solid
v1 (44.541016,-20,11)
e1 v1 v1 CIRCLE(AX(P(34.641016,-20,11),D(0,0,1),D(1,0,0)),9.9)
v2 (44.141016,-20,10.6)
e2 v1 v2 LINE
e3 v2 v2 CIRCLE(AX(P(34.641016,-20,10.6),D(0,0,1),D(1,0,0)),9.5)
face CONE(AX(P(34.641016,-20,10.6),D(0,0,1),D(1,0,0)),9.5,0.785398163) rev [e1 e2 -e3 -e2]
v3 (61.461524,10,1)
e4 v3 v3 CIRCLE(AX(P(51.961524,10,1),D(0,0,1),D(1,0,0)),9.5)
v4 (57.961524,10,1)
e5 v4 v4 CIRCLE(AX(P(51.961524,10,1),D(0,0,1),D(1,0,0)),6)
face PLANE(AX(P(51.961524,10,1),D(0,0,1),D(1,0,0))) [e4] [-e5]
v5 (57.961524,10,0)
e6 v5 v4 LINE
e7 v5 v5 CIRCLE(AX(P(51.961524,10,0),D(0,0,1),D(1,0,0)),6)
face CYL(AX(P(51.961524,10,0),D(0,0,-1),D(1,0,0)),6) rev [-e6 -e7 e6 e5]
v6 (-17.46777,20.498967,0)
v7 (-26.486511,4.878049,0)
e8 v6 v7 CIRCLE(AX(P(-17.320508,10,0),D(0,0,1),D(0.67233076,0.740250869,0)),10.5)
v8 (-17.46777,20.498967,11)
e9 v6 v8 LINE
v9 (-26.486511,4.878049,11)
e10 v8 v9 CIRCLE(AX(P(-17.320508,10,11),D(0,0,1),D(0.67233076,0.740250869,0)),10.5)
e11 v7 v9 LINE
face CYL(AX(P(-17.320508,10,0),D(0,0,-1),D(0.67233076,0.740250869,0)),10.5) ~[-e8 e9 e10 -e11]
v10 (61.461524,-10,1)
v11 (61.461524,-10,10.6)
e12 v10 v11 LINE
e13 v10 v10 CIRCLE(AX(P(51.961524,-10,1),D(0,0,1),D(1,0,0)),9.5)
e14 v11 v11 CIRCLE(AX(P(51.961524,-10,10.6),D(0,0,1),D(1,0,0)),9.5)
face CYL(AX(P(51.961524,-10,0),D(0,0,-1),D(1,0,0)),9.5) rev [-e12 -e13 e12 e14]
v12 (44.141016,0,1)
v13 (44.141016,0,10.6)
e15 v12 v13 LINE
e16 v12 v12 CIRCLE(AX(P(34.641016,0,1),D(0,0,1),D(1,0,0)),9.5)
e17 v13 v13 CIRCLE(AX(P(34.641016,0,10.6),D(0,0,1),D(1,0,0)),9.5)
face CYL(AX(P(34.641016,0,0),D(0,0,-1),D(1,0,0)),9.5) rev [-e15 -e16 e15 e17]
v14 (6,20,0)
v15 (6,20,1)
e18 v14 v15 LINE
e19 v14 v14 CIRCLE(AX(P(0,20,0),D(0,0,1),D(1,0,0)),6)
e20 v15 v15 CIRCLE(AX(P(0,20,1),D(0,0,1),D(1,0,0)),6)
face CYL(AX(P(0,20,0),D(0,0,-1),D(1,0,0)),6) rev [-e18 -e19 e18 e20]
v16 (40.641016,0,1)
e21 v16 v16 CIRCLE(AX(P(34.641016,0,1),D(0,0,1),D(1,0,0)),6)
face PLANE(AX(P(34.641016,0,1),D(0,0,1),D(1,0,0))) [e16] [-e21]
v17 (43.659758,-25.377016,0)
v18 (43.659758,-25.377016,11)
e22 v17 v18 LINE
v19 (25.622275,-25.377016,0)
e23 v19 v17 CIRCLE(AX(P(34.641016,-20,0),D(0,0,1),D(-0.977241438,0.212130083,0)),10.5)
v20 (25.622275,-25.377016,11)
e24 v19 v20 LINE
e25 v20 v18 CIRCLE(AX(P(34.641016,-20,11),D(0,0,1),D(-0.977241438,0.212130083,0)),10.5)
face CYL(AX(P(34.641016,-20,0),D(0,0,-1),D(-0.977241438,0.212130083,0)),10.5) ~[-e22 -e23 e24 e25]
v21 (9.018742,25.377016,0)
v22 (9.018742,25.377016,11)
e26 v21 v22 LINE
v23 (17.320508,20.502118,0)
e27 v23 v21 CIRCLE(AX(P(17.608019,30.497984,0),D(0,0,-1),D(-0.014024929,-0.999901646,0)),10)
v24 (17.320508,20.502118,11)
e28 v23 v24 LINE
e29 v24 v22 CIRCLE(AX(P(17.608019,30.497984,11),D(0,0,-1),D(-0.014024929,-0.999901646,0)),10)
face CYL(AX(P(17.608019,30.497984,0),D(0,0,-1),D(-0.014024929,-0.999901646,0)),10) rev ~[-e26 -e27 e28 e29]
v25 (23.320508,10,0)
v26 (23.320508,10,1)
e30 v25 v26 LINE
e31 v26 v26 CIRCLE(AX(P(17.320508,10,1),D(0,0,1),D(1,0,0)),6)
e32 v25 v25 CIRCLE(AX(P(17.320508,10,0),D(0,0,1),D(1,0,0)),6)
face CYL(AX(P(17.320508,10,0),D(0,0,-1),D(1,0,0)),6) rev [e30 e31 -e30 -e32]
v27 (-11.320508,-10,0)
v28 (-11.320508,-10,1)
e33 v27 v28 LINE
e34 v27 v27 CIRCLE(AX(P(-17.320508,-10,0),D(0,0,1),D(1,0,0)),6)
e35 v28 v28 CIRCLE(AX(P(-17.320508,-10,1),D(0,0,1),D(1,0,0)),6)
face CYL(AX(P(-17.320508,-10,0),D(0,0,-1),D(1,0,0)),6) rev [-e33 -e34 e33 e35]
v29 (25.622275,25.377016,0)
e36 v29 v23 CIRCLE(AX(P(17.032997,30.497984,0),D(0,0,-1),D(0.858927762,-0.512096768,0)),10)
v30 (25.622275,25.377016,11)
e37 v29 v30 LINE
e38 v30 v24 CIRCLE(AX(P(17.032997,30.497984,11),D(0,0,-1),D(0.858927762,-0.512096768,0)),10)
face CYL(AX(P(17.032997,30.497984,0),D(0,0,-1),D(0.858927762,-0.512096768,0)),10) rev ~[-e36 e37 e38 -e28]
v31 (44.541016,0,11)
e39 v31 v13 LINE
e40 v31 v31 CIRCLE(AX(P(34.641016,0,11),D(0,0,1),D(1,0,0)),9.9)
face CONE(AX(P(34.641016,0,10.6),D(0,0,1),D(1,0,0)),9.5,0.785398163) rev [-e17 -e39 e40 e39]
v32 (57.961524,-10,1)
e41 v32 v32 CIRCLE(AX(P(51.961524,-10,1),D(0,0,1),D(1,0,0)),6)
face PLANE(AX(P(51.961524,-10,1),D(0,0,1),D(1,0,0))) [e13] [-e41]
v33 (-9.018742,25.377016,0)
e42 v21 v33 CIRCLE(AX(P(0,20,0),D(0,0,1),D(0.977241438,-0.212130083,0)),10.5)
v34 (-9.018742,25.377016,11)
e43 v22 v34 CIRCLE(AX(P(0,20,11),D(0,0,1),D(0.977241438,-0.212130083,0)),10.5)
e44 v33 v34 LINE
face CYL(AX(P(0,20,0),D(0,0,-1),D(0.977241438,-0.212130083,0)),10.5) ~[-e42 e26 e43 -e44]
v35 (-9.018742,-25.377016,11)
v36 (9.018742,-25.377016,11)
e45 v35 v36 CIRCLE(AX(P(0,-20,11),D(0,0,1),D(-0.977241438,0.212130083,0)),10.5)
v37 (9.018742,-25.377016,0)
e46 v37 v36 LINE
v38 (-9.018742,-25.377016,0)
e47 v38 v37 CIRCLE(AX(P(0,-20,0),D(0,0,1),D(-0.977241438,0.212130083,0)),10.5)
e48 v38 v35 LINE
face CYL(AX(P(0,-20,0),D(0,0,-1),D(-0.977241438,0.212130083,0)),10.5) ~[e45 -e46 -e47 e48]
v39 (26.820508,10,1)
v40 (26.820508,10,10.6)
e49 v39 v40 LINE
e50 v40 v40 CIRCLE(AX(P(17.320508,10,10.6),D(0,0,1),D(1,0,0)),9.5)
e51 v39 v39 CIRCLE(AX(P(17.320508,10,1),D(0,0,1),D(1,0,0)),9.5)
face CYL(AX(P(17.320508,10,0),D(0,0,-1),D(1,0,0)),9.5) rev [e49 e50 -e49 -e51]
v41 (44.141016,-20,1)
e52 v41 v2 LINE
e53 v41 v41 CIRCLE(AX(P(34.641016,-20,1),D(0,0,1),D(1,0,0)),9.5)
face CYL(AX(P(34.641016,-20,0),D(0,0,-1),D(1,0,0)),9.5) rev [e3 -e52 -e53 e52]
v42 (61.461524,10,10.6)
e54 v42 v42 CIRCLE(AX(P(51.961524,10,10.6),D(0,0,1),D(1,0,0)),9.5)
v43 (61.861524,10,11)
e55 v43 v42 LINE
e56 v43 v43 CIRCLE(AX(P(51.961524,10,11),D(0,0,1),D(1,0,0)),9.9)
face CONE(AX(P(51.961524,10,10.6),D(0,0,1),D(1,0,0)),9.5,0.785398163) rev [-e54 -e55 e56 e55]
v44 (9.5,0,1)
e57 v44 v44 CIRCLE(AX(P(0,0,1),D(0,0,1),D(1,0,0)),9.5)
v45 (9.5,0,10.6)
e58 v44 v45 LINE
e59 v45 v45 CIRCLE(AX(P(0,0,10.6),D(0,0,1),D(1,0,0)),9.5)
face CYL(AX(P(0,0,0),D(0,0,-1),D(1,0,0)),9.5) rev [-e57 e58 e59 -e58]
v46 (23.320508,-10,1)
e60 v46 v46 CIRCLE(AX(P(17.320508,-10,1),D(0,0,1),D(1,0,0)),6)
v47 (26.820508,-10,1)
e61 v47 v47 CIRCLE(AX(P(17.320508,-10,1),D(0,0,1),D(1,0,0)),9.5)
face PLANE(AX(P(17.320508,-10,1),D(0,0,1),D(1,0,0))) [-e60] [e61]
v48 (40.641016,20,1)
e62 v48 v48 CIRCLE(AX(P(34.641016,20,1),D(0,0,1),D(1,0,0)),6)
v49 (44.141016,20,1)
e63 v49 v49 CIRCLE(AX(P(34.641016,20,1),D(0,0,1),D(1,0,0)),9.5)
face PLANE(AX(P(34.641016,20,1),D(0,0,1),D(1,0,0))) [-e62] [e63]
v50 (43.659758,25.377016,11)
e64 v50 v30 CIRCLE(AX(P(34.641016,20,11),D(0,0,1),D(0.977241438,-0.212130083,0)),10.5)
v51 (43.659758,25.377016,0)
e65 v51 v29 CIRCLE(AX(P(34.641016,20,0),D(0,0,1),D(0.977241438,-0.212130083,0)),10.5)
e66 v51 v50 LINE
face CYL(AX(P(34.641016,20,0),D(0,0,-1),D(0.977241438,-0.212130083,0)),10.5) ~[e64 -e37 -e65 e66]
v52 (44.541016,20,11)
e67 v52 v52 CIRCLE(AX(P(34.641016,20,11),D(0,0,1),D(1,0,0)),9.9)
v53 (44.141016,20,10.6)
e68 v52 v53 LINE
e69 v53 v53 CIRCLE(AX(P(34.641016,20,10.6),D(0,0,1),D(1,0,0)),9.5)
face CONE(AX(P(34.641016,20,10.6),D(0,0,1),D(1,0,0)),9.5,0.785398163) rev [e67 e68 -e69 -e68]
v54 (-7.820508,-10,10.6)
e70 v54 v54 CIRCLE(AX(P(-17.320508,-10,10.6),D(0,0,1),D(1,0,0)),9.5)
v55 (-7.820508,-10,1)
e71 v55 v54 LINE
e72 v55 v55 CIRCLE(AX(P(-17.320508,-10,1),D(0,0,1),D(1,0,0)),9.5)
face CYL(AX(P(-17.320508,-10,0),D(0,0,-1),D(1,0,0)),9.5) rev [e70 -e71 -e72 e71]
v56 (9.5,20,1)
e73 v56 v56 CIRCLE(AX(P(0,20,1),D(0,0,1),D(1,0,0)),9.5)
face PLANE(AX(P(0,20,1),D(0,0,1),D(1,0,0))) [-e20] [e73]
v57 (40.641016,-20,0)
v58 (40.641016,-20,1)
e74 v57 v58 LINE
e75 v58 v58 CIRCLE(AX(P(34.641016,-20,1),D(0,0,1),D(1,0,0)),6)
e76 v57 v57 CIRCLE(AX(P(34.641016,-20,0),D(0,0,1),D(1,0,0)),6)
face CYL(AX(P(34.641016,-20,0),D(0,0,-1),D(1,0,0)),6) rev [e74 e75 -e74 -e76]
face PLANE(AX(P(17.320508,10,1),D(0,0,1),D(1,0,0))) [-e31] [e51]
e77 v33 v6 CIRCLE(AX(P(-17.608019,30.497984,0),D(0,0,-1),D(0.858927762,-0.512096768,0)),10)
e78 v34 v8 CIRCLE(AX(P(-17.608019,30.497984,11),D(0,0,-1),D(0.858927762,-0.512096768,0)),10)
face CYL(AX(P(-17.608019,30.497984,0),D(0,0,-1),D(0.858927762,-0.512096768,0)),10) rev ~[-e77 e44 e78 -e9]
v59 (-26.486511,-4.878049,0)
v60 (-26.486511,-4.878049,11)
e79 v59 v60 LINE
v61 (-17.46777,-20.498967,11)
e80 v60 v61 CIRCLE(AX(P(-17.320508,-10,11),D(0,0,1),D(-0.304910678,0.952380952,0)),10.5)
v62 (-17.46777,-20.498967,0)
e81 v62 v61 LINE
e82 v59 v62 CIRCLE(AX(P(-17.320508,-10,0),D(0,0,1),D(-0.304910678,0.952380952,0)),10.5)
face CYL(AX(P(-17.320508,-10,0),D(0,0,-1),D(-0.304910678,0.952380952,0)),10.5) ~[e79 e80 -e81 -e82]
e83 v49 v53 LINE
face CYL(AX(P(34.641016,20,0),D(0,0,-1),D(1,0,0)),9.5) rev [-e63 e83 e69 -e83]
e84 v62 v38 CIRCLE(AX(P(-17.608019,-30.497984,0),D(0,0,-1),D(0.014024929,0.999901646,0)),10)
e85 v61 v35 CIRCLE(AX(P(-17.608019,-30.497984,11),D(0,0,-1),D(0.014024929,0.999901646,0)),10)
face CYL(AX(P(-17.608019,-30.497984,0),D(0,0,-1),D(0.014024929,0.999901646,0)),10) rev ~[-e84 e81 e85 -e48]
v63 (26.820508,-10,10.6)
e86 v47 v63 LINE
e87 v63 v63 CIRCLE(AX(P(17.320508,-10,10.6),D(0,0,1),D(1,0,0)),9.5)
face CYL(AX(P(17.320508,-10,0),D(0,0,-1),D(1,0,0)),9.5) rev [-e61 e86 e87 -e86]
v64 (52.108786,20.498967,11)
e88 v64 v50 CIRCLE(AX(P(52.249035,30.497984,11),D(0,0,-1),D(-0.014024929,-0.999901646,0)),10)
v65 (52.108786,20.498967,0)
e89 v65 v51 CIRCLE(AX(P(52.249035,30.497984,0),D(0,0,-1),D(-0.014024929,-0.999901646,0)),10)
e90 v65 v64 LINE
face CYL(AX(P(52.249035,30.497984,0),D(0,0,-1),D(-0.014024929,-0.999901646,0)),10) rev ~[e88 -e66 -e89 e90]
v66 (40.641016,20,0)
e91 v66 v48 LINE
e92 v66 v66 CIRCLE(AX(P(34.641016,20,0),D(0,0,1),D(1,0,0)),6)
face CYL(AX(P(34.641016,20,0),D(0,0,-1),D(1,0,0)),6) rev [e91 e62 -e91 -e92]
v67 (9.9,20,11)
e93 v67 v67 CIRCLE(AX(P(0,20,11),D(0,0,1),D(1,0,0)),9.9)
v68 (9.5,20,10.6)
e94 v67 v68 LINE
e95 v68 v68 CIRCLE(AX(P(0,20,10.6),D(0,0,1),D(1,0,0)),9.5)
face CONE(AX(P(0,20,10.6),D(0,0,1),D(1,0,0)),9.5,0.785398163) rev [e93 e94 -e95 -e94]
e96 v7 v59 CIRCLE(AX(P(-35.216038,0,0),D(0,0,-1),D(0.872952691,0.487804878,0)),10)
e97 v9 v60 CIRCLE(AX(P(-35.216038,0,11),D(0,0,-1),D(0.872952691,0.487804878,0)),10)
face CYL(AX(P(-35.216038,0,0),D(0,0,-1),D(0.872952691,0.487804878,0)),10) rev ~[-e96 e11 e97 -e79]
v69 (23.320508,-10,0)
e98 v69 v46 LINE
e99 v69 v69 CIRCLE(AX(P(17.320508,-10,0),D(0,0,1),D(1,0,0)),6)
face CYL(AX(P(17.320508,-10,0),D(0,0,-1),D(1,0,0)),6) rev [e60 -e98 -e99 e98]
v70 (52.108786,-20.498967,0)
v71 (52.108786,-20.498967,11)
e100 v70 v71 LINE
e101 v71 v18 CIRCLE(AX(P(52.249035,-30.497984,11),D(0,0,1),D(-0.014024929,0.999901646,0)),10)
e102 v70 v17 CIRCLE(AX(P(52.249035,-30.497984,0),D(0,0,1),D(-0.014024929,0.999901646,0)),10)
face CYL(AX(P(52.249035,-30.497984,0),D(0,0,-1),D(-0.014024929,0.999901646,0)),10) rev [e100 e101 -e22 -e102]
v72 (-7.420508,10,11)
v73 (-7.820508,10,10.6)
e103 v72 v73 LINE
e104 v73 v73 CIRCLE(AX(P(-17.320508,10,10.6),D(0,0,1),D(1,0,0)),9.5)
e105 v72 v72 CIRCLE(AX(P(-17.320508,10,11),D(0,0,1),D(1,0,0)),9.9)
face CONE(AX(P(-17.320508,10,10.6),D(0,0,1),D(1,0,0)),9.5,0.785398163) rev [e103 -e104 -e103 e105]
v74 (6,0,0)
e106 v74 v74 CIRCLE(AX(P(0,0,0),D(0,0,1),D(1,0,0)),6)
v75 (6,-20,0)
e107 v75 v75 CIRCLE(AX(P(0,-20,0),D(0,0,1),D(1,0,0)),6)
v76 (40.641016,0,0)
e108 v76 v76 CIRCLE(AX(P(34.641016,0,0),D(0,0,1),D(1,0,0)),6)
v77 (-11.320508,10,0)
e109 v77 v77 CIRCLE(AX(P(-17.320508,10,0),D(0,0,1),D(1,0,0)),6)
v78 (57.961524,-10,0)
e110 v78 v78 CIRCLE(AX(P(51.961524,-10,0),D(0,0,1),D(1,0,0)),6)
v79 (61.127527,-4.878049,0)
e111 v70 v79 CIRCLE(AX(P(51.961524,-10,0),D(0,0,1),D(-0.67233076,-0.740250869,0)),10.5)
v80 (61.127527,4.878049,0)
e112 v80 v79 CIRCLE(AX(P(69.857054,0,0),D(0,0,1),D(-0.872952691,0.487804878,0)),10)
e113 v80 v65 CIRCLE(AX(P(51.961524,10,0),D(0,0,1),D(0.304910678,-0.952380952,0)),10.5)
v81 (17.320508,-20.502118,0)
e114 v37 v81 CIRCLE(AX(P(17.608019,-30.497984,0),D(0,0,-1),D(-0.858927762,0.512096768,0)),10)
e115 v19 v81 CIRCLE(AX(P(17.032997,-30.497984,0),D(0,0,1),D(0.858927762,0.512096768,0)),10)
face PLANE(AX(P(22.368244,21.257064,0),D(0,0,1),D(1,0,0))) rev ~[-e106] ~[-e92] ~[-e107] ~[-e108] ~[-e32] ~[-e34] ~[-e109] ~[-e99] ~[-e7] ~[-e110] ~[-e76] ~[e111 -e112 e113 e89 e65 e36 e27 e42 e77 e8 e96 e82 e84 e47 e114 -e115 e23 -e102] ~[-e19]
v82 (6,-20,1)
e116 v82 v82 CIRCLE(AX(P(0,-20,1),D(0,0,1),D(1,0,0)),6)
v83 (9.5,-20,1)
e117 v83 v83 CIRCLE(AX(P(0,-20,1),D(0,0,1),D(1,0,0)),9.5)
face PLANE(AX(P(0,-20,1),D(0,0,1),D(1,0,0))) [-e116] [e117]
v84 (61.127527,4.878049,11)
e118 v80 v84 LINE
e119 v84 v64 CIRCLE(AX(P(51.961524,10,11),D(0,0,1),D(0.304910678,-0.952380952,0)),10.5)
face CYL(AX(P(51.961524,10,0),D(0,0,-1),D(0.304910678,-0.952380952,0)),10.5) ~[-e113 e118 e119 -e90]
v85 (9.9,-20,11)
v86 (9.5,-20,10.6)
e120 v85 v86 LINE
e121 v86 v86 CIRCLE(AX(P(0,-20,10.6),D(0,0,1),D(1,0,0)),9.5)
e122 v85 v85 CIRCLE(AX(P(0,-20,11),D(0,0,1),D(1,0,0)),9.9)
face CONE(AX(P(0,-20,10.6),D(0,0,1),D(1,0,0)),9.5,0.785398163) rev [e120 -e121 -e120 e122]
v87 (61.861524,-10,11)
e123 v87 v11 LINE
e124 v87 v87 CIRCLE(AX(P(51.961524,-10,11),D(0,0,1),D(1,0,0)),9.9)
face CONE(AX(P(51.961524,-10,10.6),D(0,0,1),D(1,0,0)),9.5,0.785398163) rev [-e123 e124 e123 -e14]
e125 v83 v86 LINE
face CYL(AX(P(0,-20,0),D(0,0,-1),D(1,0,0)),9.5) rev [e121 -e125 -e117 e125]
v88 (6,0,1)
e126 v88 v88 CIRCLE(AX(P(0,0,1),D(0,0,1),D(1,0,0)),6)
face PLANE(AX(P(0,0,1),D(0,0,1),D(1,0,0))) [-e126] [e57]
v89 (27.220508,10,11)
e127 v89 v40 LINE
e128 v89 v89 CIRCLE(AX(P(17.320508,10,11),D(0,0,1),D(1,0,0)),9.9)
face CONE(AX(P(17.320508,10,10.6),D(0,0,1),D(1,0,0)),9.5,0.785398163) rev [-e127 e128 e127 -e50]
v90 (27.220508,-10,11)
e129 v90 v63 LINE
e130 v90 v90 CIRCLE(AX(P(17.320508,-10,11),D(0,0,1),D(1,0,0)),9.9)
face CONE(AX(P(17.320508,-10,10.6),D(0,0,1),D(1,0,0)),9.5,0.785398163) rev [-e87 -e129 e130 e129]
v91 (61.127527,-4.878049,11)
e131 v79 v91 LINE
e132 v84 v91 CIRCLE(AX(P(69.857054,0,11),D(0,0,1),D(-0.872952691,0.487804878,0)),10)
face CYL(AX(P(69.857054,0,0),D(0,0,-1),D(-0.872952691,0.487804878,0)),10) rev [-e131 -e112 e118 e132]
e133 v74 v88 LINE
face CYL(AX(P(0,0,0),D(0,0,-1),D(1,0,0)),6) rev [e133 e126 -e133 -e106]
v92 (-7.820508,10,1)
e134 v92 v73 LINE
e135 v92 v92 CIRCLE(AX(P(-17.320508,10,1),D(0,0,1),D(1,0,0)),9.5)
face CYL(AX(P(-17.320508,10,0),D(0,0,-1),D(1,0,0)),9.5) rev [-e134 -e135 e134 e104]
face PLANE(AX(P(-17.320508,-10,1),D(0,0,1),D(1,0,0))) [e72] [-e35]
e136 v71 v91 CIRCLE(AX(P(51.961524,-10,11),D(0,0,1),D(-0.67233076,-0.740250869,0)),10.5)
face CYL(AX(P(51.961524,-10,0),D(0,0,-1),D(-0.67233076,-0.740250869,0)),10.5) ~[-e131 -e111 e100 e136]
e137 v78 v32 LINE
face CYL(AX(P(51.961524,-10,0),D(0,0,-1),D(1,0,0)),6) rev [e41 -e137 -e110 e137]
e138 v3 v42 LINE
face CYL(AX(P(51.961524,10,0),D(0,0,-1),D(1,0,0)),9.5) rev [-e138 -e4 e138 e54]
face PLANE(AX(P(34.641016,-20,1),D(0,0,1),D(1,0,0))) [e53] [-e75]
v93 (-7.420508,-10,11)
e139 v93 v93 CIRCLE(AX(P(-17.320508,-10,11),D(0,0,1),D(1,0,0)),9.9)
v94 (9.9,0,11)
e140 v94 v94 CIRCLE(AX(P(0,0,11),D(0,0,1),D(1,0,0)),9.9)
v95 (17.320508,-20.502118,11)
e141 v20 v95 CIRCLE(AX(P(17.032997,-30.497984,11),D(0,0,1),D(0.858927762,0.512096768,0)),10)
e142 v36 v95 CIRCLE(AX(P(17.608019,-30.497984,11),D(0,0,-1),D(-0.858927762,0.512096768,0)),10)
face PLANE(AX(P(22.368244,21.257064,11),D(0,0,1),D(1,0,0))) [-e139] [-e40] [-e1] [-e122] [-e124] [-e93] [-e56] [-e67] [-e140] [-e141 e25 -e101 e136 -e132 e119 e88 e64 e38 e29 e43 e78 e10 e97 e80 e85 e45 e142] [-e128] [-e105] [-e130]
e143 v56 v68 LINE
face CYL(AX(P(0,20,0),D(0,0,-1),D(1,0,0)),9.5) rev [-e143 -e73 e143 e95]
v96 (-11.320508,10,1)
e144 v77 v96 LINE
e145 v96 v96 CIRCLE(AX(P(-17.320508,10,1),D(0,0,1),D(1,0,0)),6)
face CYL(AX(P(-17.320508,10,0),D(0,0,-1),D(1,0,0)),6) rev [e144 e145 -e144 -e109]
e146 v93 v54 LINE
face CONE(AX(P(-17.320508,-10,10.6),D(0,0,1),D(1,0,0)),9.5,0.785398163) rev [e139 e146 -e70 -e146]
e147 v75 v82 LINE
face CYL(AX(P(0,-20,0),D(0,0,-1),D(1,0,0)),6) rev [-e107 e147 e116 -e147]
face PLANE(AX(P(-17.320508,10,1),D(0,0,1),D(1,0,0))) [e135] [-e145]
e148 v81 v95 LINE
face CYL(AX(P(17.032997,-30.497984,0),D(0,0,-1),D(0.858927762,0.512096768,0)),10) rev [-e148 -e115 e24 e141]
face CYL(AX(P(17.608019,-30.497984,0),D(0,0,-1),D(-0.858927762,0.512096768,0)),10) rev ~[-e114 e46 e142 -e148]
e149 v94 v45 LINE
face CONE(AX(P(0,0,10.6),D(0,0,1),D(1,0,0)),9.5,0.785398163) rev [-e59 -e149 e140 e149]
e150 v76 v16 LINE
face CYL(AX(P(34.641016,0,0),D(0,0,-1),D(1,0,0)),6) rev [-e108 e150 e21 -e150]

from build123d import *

# Parameters (mm, degrees)
F0_R        = 9.5
F1_DEPTH    = 11
F0_R_2      = 6
F2_DEPTH    = 1
F3_T1_DEPTH = 11
F4_SIZE     = 0.4


# Not quite as in the source:
# - a fillet or chamfer that OpenCascade refuses, or shapes differently, is made with other operations: its cross-section is extruded or revolved along the edge and cut away or added


with BuildPart() as f1:
    # F0 (on Top) → F1 (new body)
    with BuildSketch(Plane.XY):
        with BuildLine():
            ThreePointArc((10.2610350972, 17.7726341266), (0, 30.5), (-10.2610350972, 17.7726341266))
            ThreePointArc((-10.2610350972, 17.7726341266), (-26.4137748154, 15.25), (-20.5220701944, 0))
            ThreePointArc((-20.5220701944, 0), (-26.4137748154, -15.25), (-10.2610350972, -17.7726341266))
            ThreePointArc((-10.2610350972, -17.7726341266), (0, -30.5), (10.2610350972, -17.7726341266))
            ThreePointArc((10.2610350972, -17.7726341266), (17.3205080757, -20.5), (24.3799810542, -17.7726341266))
            ThreePointArc((24.3799810542, -17.7726341266), (34.6410161514, -30.5), (44.9020512486, -17.7726341266))
            ThreePointArc((44.9020512486, -17.7726341266), (61.0547909668, -15.25), (55.1630863458, 0))
            ThreePointArc((55.1630863458, 0), (61.0547909668, 15.25), (44.9020512486, 17.7726341266))
            ThreePointArc((44.9020512486, 17.7726341266), (34.6410161514, 30.5), (24.3799810542, 17.7726341266))
            ThreePointArc((24.3799810542, 17.7726341266), (17.3205080757, 20.5), (10.2610350972, 17.7726341266))
        make_face()
        with Locations((0, -20)):
            Circle(F0_R, mode=Mode.SUBTRACT)
        with Locations((-17.3205080757, -10)):
            Circle(F0_R, mode=Mode.SUBTRACT)
        with Locations((34.6410161514, -20)):
            Circle(F0_R, mode=Mode.SUBTRACT)
        with Locations((17.3205080757, -10)):
            Circle(F0_R, mode=Mode.SUBTRACT)
        with Locations((51.9615242271, -10)):
            Circle(F0_R, mode=Mode.SUBTRACT)
        with Locations((-17.3205080757, 10)):
            Circle(F0_R, mode=Mode.SUBTRACT)
        Circle(F0_R, mode=Mode.SUBTRACT)
        with Locations((0, 20)):
            Circle(F0_R, mode=Mode.SUBTRACT)
        with Locations((34.6410161514, 0)):
            Circle(F0_R, mode=Mode.SUBTRACT)
        with Locations((17.3205080757, 10)):
            Circle(F0_R, mode=Mode.SUBTRACT)
        with Locations((51.9615242271, 10)):
            Circle(F0_R, mode=Mode.SUBTRACT)
        with Locations((34.6410161514, 20)):
            Circle(F0_R, mode=Mode.SUBTRACT)
    extrude(amount=F1_DEPTH)

    # F0 (on Top) → F2 (join)
    with BuildSketch(Plane.XY):
        with Locations((0, 20)):
            Circle(F0_R)
        with Locations((0, 20)):
            Circle(F0_R_2, mode=Mode.SUBTRACT)
        with Locations((-17.3205080757, 10)):
            Circle(F0_R)
        with Locations((-17.3205080757, 10)):
            Circle(F0_R_2, mode=Mode.SUBTRACT)
        with Locations((-17.3205080757, -10)):
            Circle(F0_R)
        with Locations((-17.3205080757, -10)):
            Circle(F0_R_2, mode=Mode.SUBTRACT)
        Circle(F0_R)
        Circle(F0_R_2, mode=Mode.SUBTRACT)
        with Locations((0, -20)):
            Circle(F0_R)
        with Locations((0, -20)):
            Circle(F0_R_2, mode=Mode.SUBTRACT)
        with Locations((17.3205080757, -10)):
            Circle(F0_R)
        with Locations((17.3205080757, -10)):
            Circle(F0_R_2, mode=Mode.SUBTRACT)
        with Locations((17.3205080757, 10)):
            Circle(F0_R)
        with Locations((17.3205080757, 10)):
            Circle(F0_R_2, mode=Mode.SUBTRACT)
        with Locations((34.6410161514, 20)):
            Circle(F0_R)
        with Locations((34.6410161514, 20)):
            Circle(F0_R_2, mode=Mode.SUBTRACT)
        with Locations((34.6410161514, 0)):
            Circle(F0_R)
        with Locations((34.6410161514, 0)):
            Circle(F0_R_2, mode=Mode.SUBTRACT)
        with Locations((34.6410161514, -20)):
            Circle(F0_R)
        with Locations((34.6410161514, -20)):
            Circle(F0_R_2, mode=Mode.SUBTRACT)
        with Locations((51.9615242271, -10)):
            Circle(F0_R)
        with Locations((51.9615242271, -10)):
            Circle(F0_R_2, mode=Mode.SUBTRACT)
        with Locations((51.9615242271, 10)):
            Circle(F0_R)
        with Locations((51.9615242271, 10)):
            Circle(F0_R_2, mode=Mode.SUBTRACT)
    extrude(amount=F2_DEPTH)

    # F3: fillet of radius 10 on 10 edges, made by hand

    # F3_s2 → F3_t1 (join)
    with BuildSketch(Plane.XY):
        with BuildLine():
            ThreePointArc((25.6222746499, 25.3770160619), (22.0329970294, 21.837729702), (17.1732463203, 20.4989672814))
            ThreePointArc((17.1732463203, 20.4989672814), (21.0357320415, 19.8207489981), (24.3799810542, 17.7726341266))
            ThreePointArc((24.3799810542, 17.7726341266), (24.2783860519, 21.692896164), (25.6222746499, 25.3770160619))
        make_face()
        with BuildLine():
            ThreePointArc((17.4677698311, 20.4989672814), (12.6080191219, 21.837729702), (9.0187415015, 25.3770160619))
            ThreePointArc((9.0187415015, 25.3770160619), (10.3626300995, 21.692896164), (10.2610350972, 17.7726341266))
            ThreePointArc((10.2610350972, 17.7726341266), (13.6052841099, 19.8207489981), (17.4677698311, 20.4989672814))
        make_face()
        with BuildLine():
            ThreePointArc((-9.0187415015, 25.3770160619), (-12.6080191219, 21.837729702), (-17.4677698311, 20.4989672814))
            ThreePointArc((-17.4677698311, 20.4989672814), (-13.6052841099, 19.8207489981), (-10.2610350972, 17.7726341266))
            ThreePointArc((-10.2610350972, 17.7726341266), (-10.3626300995, 21.692896164), (-9.0187415015, 25.3770160619))
        make_face()
        with BuildLine():
            ThreePointArc((-26.4865113326, 4.8780487805), (-25.2160382439, 0), (-26.4865113326, -4.8780487805))
            ThreePointArc((-26.4865113326, -4.8780487805), (-23.9679142094, -1.8721471658), (-20.5220701944, 0))
            ThreePointArc((-20.5220701944, 0), (-23.9679142094, 1.8721471658), (-26.4865113326, 4.8780487805))
        make_face()
        with BuildLine():
            ThreePointArc((-17.4677698311, -20.4989672814), (-12.6080191219, -21.837729702), (-9.0187415015, -25.3770160619))
            ThreePointArc((-9.0187415015, -25.3770160619), (-10.3626300995, -21.692896164), (-10.2610350972, -17.7726341266))
            ThreePointArc((-10.2610350972, -17.7726341266), (-13.6052841099, -19.8207489981), (-17.4677698311, -20.4989672814))
        make_face()
        with BuildLine():
            ThreePointArc((9.0187415015, -25.3770160619), (12.6080191219, -21.837729702), (17.4677698311, -20.4989672814))
            ThreePointArc((17.4677698311, -20.4989672814), (13.6052841099, -19.8207489981), (10.2610350972, -17.7726341266))
            ThreePointArc((10.2610350972, -17.7726341266), (10.3626300995, -21.692896164), (9.0187415015, -25.3770160619))
        make_face()
        with BuildLine():
            ThreePointArc((25.6222746499, -25.3770160619), (22.0329970294, -21.837729702), (17.1732463203, -20.4989672814))
            ThreePointArc((17.1732463203, -20.4989672814), (21.0357320415, -19.8207489981), (24.3799810542, -17.7726341266))
            ThreePointArc((24.3799810542, -17.7726341266), (24.2783860519, -21.692896164), (25.6222746499, -25.3770160619))
        make_face()
        with BuildLine():
            ThreePointArc((52.1087859825, -20.4989672814), (47.2490352733, -21.837729702), (43.6597576529, -25.3770160619))
            ThreePointArc((43.6597576529, -25.3770160619), (45.0036462508, -21.692896164), (44.9020512486, -17.7726341266))
            ThreePointArc((44.9020512486, -17.7726341266), (48.2463002613, -19.8207489981), (52.1087859825, -20.4989672814))
        make_face()
        with BuildLine():
            ThreePointArc((61.1275274839, 4.8780487805), (59.8570543952, 0), (61.1275274839, -4.8780487805))
            ThreePointArc((61.1275274839, -4.8780487805), (58.6089303607, -1.8721471658), (55.1630863458, 0))
            ThreePointArc((55.1630863458, 0), (58.6089303607, 1.8721471658), (61.1275274839, 4.8780487805))
        make_face()
        with BuildLine():
            ThreePointArc((52.1087859825, 20.4989672814), (47.2490352733, 21.837729702), (43.6597576529, 25.3770160619))
            ThreePointArc((43.6597576529, 25.3770160619), (45.0036462508, 21.692896164), (44.9020512486, 17.7726341266))
            ThreePointArc((44.9020512486, 17.7726341266), (48.2463002613, 19.8207489981), (52.1087859825, 20.4989672814))
        make_face()
    extrude(amount=F3_T1_DEPTH)

    # F4
    f4_edges = [f1.edges().sort_by_distance(p)[0] for p in [
        (-26.820508, 10, 11),
        (-9.5, 20, 11),
        (-26.820508, -10, 11),
        (-9.5, 0, 11),
        (-9.5, -20, 11),
        (7.820508, -10, 11),
        (7.820508, 10, 11),
        (25.141016, 20, 11),
        (25.141016, 0, 11),
        (42.461524, 10, 11),
        (42.461524, -10, 11),
        (25.141016, -20, 11),
    ]]
    chamfer(f4_edges, length=F4_SIZE)


solid = f1.part
